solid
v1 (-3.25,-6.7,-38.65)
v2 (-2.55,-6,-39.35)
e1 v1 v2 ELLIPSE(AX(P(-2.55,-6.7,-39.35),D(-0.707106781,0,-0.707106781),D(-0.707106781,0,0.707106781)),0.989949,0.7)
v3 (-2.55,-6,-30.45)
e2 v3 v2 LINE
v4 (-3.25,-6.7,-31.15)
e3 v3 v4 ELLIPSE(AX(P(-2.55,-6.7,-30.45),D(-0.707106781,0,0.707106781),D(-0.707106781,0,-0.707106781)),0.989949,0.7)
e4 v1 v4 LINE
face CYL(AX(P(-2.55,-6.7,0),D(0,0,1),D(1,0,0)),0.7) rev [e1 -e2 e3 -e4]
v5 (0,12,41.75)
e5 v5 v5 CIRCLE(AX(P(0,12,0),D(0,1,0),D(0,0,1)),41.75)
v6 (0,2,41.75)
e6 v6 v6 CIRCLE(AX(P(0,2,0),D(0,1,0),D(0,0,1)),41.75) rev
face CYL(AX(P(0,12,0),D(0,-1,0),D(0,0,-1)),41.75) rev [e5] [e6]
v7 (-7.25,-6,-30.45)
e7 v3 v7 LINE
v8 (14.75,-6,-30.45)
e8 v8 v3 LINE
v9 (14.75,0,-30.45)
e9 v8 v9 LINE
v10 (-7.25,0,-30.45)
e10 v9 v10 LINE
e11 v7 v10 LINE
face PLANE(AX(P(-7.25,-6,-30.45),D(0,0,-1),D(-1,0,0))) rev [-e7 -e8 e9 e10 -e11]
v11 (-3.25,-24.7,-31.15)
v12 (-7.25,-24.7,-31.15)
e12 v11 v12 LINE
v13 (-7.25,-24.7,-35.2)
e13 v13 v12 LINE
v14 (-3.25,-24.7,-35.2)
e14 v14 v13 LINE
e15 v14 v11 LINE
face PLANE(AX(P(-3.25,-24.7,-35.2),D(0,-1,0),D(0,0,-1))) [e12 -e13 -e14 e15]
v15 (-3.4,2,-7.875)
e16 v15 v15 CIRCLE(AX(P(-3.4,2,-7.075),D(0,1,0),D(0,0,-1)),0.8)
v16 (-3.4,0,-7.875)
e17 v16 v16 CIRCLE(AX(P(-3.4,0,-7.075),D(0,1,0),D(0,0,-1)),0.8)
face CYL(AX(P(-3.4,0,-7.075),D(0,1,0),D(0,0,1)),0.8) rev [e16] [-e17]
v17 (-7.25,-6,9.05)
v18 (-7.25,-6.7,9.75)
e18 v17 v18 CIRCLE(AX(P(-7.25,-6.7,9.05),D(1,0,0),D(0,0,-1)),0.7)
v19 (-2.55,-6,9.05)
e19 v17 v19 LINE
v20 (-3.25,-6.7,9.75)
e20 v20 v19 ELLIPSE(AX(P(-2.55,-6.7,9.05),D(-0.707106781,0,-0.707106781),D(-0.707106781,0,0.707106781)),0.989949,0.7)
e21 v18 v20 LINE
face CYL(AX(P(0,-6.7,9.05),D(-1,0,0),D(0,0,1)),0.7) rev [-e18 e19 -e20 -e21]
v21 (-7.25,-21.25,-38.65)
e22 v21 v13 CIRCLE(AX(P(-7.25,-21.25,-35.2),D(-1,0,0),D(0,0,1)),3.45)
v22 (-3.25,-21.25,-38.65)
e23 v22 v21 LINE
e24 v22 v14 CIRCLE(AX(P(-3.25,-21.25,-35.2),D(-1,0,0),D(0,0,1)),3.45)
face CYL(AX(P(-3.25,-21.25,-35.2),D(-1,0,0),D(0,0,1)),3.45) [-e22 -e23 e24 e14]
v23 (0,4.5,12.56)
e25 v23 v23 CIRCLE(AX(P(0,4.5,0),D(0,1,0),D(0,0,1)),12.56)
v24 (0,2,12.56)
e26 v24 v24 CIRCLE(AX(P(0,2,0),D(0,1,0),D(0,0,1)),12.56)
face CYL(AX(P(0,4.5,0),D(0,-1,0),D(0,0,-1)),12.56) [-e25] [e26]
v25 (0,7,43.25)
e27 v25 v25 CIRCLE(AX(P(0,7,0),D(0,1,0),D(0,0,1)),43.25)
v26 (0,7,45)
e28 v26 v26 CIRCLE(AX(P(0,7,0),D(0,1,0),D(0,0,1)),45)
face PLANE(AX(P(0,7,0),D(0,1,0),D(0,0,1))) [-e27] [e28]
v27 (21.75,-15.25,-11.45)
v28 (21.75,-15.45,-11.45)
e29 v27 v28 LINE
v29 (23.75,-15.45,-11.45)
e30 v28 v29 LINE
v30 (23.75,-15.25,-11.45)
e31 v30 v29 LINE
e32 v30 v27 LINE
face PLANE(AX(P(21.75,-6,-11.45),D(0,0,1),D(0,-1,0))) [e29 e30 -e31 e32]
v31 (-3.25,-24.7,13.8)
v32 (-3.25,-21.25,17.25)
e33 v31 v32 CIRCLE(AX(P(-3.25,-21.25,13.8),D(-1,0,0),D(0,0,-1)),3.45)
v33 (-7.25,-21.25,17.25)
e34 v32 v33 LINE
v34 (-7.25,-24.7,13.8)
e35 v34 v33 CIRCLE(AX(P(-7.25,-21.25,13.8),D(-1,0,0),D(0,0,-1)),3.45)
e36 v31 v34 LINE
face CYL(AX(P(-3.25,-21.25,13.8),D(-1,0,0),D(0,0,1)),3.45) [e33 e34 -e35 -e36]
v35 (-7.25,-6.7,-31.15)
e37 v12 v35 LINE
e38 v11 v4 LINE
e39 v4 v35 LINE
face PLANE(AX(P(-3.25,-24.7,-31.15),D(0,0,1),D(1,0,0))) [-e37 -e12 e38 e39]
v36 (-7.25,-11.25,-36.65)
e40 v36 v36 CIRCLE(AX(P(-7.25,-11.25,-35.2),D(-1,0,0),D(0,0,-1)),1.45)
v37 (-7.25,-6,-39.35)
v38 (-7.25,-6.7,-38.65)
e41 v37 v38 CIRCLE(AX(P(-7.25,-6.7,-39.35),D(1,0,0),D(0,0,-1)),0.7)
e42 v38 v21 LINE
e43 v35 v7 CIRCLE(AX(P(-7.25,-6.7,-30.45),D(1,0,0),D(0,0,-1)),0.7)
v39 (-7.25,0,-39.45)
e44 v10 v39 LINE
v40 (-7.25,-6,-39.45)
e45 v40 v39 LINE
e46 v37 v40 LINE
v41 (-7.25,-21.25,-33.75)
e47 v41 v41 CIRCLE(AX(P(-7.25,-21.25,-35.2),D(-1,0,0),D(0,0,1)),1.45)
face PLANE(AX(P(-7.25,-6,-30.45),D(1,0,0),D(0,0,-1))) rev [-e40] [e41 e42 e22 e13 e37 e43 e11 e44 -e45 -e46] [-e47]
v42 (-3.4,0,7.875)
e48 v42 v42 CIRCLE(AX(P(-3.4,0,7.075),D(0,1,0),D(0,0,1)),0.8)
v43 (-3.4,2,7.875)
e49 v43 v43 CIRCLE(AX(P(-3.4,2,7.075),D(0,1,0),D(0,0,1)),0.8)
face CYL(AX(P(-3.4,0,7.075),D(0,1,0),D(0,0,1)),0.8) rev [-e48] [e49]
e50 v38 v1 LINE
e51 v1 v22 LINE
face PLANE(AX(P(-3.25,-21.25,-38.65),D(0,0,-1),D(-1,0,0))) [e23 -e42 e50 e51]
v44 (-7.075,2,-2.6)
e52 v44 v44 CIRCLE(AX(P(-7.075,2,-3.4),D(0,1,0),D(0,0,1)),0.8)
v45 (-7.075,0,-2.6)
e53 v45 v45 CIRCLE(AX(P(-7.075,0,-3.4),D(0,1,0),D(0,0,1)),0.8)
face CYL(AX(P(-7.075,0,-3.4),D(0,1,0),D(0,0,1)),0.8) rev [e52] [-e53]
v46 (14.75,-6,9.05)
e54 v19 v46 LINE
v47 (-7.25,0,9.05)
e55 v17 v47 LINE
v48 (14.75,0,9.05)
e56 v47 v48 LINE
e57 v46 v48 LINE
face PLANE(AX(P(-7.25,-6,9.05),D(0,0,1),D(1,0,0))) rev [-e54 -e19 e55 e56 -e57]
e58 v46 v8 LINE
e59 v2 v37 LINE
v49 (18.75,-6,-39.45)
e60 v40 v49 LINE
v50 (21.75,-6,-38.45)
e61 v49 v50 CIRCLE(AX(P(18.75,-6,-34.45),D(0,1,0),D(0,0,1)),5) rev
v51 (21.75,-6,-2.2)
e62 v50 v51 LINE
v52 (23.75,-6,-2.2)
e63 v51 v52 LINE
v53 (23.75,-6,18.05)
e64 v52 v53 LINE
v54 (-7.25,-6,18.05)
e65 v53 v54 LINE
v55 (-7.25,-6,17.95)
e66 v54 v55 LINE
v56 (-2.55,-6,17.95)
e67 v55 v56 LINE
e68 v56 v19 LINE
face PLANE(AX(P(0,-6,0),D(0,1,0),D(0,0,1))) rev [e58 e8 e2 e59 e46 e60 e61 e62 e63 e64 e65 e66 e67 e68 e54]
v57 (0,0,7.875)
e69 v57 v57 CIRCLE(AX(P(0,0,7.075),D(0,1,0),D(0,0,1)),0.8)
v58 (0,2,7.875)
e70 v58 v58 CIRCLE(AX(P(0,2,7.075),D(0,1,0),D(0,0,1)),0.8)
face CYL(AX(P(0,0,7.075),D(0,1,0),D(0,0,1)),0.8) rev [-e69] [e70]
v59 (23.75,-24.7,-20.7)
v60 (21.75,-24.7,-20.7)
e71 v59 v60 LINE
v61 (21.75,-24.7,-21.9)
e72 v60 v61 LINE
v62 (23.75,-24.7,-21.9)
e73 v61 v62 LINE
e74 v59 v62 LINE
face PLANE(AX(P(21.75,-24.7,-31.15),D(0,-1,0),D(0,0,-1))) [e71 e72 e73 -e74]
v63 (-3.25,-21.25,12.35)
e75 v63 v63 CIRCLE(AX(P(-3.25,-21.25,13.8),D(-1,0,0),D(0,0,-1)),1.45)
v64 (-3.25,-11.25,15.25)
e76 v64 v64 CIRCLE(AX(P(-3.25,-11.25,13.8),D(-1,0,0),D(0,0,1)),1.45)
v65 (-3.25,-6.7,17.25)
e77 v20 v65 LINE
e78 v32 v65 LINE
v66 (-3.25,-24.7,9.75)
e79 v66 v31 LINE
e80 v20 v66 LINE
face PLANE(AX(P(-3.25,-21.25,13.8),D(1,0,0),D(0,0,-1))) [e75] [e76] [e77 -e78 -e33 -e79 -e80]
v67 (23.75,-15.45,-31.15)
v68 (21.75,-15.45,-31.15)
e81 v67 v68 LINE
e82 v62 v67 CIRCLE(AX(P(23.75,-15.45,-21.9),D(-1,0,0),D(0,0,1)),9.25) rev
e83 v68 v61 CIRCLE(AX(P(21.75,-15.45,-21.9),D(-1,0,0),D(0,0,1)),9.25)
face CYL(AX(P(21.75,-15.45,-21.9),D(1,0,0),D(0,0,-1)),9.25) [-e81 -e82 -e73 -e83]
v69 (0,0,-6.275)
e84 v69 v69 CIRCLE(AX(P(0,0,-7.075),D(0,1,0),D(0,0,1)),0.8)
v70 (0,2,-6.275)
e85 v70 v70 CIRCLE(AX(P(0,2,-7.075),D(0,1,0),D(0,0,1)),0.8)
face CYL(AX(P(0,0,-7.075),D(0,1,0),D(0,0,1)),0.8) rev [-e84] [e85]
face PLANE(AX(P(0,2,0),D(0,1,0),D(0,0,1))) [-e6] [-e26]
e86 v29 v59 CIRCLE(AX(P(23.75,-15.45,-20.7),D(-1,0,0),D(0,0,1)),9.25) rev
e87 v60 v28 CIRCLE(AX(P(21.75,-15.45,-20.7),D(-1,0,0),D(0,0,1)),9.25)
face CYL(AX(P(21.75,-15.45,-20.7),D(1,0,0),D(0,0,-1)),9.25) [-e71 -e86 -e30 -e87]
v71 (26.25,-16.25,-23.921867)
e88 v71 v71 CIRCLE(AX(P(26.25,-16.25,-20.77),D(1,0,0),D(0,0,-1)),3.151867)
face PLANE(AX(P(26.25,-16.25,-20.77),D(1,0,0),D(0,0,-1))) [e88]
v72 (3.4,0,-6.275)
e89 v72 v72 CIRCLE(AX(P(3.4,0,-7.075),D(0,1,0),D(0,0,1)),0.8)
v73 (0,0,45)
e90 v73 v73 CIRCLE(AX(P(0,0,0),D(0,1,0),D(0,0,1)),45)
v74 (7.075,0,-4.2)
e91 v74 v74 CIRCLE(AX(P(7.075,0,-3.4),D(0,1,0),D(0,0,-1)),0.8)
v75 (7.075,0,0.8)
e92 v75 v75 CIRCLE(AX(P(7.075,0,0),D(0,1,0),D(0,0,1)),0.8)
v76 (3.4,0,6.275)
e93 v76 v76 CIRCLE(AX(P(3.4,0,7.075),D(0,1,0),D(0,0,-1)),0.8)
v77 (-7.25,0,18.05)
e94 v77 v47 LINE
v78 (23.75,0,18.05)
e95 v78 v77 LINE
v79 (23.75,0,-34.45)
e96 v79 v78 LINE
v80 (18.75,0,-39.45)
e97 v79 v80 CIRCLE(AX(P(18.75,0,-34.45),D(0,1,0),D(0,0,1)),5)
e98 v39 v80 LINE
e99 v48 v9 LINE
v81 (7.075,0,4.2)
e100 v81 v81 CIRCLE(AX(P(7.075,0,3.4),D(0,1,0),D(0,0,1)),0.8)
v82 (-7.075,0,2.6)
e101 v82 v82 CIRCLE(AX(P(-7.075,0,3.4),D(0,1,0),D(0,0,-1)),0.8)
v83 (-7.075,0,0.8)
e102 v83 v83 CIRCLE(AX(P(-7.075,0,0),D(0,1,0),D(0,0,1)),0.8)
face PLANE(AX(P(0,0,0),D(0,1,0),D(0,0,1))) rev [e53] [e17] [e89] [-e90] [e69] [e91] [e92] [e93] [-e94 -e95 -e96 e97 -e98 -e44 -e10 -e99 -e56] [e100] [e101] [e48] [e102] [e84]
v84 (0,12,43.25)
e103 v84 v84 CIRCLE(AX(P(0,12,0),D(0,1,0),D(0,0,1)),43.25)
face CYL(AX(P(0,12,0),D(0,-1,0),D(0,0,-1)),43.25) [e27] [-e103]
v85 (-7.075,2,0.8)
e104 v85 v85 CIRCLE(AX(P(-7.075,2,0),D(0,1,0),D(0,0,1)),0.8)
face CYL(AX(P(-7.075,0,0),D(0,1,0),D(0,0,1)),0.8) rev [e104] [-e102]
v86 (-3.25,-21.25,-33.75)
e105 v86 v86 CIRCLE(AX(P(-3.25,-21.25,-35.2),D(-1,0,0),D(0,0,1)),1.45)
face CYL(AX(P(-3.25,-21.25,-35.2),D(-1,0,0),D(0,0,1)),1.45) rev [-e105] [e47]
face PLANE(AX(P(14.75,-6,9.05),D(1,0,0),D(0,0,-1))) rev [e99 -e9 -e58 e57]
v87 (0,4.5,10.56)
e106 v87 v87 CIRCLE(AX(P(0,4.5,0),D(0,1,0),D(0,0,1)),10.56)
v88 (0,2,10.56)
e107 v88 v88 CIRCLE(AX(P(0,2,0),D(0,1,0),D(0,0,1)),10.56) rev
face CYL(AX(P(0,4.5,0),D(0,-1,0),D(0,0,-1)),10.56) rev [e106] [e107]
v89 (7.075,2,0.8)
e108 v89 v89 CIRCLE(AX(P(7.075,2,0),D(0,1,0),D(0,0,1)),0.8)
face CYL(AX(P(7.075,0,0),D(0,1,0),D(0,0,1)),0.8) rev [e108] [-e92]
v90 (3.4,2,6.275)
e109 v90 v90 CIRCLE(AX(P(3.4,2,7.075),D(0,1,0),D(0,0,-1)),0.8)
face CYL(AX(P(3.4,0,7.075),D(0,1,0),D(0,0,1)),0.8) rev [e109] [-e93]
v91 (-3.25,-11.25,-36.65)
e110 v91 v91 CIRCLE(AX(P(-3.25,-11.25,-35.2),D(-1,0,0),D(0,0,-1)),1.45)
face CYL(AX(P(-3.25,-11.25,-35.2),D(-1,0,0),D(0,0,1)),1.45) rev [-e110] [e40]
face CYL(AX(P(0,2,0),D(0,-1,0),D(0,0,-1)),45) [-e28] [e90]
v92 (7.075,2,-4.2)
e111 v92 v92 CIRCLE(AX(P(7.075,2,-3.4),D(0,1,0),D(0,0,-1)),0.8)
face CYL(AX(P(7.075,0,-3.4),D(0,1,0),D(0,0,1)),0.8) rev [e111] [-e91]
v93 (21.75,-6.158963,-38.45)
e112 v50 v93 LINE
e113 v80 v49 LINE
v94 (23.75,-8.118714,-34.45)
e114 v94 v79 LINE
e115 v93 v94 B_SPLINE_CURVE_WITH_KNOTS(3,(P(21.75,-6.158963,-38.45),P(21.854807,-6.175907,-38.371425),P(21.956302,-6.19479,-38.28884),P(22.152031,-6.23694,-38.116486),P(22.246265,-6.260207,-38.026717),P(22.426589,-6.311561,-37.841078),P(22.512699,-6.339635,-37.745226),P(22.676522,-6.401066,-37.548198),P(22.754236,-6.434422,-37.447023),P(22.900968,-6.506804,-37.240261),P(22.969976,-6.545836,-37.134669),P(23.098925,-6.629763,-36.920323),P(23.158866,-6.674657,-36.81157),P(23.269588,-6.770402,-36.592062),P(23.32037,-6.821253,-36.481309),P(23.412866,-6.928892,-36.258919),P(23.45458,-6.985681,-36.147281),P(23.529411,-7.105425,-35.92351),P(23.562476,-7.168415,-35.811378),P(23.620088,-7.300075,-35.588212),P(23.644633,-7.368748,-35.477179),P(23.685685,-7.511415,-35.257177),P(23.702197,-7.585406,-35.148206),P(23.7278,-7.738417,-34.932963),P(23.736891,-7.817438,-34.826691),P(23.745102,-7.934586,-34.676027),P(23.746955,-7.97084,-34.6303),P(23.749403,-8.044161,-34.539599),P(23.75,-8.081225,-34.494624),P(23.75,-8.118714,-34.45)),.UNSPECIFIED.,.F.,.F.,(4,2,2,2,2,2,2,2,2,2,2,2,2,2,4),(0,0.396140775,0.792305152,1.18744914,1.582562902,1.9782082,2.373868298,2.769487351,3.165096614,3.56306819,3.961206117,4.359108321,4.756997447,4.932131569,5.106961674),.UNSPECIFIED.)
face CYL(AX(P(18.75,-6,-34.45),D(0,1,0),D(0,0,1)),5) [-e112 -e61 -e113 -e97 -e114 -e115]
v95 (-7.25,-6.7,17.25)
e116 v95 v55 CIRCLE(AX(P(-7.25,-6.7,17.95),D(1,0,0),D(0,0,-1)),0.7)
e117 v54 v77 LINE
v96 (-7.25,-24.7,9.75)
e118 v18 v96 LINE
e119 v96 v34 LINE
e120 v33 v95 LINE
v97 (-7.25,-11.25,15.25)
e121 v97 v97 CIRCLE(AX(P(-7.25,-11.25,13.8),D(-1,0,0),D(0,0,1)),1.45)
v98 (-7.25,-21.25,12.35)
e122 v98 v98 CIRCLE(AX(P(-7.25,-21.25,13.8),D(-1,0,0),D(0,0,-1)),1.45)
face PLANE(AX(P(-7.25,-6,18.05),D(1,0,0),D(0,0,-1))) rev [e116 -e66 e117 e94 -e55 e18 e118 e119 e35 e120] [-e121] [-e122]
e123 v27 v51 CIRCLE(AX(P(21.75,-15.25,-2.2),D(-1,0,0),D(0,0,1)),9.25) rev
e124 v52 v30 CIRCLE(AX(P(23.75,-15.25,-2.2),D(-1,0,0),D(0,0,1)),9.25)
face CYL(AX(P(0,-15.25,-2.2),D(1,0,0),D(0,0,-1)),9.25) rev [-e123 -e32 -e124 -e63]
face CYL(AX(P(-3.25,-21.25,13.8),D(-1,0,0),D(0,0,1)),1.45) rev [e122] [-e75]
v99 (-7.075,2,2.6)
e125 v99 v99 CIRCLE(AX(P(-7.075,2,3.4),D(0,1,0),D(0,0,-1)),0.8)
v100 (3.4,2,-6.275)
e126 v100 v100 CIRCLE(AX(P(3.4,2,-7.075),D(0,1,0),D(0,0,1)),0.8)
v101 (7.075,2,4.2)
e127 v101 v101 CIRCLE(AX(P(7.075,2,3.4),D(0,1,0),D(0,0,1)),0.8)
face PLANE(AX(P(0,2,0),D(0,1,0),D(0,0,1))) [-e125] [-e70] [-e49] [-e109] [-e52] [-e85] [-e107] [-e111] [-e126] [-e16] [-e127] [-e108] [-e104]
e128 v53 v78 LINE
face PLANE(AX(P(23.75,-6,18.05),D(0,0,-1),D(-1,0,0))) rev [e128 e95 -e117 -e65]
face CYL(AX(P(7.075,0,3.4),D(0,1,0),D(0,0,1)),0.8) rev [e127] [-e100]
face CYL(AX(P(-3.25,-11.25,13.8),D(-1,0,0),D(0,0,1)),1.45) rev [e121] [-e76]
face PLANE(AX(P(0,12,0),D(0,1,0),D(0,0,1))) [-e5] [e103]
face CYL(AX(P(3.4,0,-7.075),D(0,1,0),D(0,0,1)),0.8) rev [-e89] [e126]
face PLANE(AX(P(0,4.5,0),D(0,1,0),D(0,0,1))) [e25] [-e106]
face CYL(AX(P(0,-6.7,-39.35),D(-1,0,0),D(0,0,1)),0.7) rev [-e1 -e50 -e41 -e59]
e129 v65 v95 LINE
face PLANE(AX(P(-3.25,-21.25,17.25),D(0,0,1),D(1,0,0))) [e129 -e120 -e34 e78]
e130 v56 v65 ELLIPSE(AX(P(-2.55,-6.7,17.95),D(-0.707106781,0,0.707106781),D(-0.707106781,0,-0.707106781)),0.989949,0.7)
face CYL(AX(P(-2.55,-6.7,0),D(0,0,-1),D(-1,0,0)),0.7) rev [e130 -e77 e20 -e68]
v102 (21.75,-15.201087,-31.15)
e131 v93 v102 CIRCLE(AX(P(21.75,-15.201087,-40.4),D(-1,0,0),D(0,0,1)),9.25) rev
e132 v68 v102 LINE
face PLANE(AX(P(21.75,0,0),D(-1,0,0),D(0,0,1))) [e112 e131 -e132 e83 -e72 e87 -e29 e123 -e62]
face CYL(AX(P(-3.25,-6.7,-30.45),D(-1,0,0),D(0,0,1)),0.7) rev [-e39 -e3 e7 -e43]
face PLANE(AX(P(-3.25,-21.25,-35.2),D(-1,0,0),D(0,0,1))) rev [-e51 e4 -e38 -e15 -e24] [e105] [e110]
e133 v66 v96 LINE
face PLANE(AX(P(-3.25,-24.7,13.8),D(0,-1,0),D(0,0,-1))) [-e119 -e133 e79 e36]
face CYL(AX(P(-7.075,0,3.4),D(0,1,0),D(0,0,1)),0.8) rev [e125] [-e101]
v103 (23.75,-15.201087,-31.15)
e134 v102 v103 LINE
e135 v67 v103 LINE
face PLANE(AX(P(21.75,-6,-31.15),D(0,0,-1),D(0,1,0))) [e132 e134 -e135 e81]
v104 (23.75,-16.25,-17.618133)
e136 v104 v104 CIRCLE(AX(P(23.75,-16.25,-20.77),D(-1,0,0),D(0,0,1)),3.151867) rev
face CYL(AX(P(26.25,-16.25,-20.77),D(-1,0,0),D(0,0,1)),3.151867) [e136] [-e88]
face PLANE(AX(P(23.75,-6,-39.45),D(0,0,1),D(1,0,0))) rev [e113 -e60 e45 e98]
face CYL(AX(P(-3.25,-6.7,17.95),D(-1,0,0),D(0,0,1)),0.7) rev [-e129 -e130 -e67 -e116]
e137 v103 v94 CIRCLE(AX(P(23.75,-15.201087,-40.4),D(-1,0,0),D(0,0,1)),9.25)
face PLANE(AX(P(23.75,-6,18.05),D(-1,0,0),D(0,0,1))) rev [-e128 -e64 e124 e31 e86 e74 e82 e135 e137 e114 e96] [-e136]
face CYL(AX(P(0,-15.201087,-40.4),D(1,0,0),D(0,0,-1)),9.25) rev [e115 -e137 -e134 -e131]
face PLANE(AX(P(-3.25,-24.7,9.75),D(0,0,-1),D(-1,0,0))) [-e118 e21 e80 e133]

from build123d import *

# Parameters (mm, degrees)
CROQUIS2_R              = 45
SALIENTE_EXTRUIR1_DEPTH = 2
CROQUIS3_R              = 43.25
CROQUIS3_R_2            = 41.75
SALIENTE_EXTRUIR2_DEPTH = 10
CROQUIS4_R              = 45
CROQUIS4_R_2            = 43.25
SALIENTE_EXTRUIR3_DEPTH = 5
CROQUIS6_R              = 12.56
CROQUIS6_R_2            = 10.56
SALIENTE_EXTRUIR4_DEPTH = 2.5
CROQUIS7_R              = 0.8
CORTAR_EXTRUIR1_DEPTH   = 65.420493634
SALIENTE_EXTRUIR5_DEPTH = 6
CROQUIS10_R             = 1.45
SALIENTE_EXTRUIR6_DEPTH = 4
CROQUIS11_W             = 19.7
CROQUIS11_H             = 18.7
SALIENTE_EXTRUIR7_DEPTH = 2
CROQUIS12_R             = 3.151866764
SALIENTE_EXTRUIR8_DEPTH = 2.5
REDONDEO1_R             = 9.25
REDONDEO2_R             = 0.7
REDONDEO4_R             = 5


# Some blends are built 0.0001 mm under size
with BuildPart() as part:
    # Croquis2 → Saliente-Extruir1 (new body)
    with BuildSketch(Plane(origin=(0, 0, 0), x_dir=(1, 0, 0), z_dir=(0, 1, 0))):
        with Locations(Location((0, 0, 0), (0, 0, 270))):
            Circle(CROQUIS2_R)
    extrude(amount=SALIENTE_EXTRUIR1_DEPTH)

    # Croquis3 → Saliente-Extruir2 (add)
    with BuildSketch(Plane(origin=(0, 2, 0), x_dir=(1, 0, 0), z_dir=(0, 1, 0))):
        with Locations(Location((0, 0, 0), (0, 0, 270))):
            Circle(CROQUIS3_R)
        with Locations(Location((0, 0, 0), (0, 0, 270))):
            Circle(CROQUIS3_R_2, mode=Mode.SUBTRACT)
    extrude(amount=SALIENTE_EXTRUIR2_DEPTH)

    # Croquis4 → Saliente-Extruir3 (add)
    with BuildSketch(Plane(origin=(0, 2, 0), x_dir=(1, 0, 0), z_dir=(0, 1, 0))):
        with Locations(Location((0, 0, 0), (0, 0, 270))):
            Circle(CROQUIS4_R)
        with Locations(Location((0, 0, 0), (0, 0, 270))):
            Circle(CROQUIS4_R_2, mode=Mode.SUBTRACT)
    extrude(amount=SALIENTE_EXTRUIR3_DEPTH)

    # Croquis6 → Saliente-Extruir4 (add)
    with BuildSketch(Plane(origin=(0, 2, 0), x_dir=(1, 0, 0), z_dir=(0, 1, 0))):
        with Locations(Location((0, 0, 0), (0, 0, 270))):
            Circle(CROQUIS6_R)
        with Locations(Location((0, 0, 0), (0, 0, 270))):
            Circle(CROQUIS6_R_2, mode=Mode.SUBTRACT)
    extrude(amount=SALIENTE_EXTRUIR4_DEPTH)

    # Croquis7 → Cortar-Extruir1 (cut, through all)
    with BuildSketch(Plane(origin=(0, 2, 0), x_dir=(1, 0, 0), z_dir=(0, 1, 0))):
        with Locations(Location((0, 7.075, 0), (0, 0, 270))):
            Circle(CROQUIS7_R)
        with Locations(Location((3.4, 7.075, 0), (0, 0, 270))):
            Circle(CROQUIS7_R)
        with Locations(Location((-3.4, 7.075, 0), (0, 0, 90))):
            Circle(CROQUIS7_R)
        with Locations(Location((7.075, 3.4, 0), (0, 0, 90))):
            Circle(CROQUIS7_R)
        with Locations(Location((7.075, 0, 0), (0, 0, 270))):
            Circle(CROQUIS7_R)
        with Locations(Location((7.075, -3.4, 0), (0, 0, 270))):
            Circle(CROQUIS7_R)
        with Locations(Location((3.4, -7.075, 0), (0, 0, 90))):
            Circle(CROQUIS7_R)
        with Locations(Location((0, -7.075, 0), (0, 0, 270))):
            Circle(CROQUIS7_R)
        with Locations(Location((-3.4, -7.075, 0), (0, 0, 270))):
            Circle(CROQUIS7_R)
        with Locations(Location((-7.075, -3.4, 0), (0, 0, 90))):
            Circle(CROQUIS7_R)
        with Locations(Location((-7.075, 0, 0), (0, 0, 270))):
            Circle(CROQUIS7_R)
        with Locations(Location((-7.075, 3.4, 0), (0, 0, 270))):
            Circle(CROQUIS7_R)
    extrude(amount=-CORTAR_EXTRUIR1_DEPTH, mode=Mode.SUBTRACT)

    # Croquis8 → Saliente-Extruir5 (add)
    with BuildSketch(Plane.XZ):
        Polygon((-7.25, 9.05), (14.75, 9.05), (14.75, -30.45), (-7.25, -30.45), (-7.25, -39.45), (23.75, -39.45), (23.75, 18.05), (-7.25, 18.05), align=None)
    extrude(amount=SALIENTE_EXTRUIR5_DEPTH)

    # Croquis10 → Saliente-Extruir6 (add)
    # profile 1 of 2: a face of its own
    with BuildSketch(Plane.ZY.offset(7.25)):
        with BuildLine():
            Line((9.75, -24.7), (9.75, -6))
            Line((9.75, -6), (17.25, -6))
            Line((17.25, -6), (17.25, -21.25))
            ThreePointArc((17.25, -21.25), (16.239518395, -23.689518395), (13.8, -24.7))
            Line((13.8, -24.7), (9.75, -24.7))
        make_face()
        with Locations((13.8, -11.25)):
            Circle(CROQUIS10_R, mode=Mode.SUBTRACT)
        with Locations(Location((13.8, -21.25, 0), (0, 0, 180))):
            Circle(CROQUIS10_R, mode=Mode.SUBTRACT)
    # profile 2 of 2: a face of its own
    with BuildSketch(Plane.ZY.offset(7.25)):
        with BuildLine():
            Line((-31.15, -24.7), (-31.15, -6))
            Line((-31.15, -6), (-38.65, -6))
            Line((-38.65, -6), (-38.65, -21.25))
            ThreePointArc((-38.65, -21.25), (-37.639518395, -23.689518395), (-35.2, -24.7))
            Line((-35.2, -24.7), (-31.15, -24.7))
        make_face()
        with Locations((-35.2, -21.25)):
            Circle(CROQUIS10_R, mode=Mode.SUBTRACT)
        with Locations(Location((-35.2, -11.25, 0), (0, 0, 180))):
            Circle(CROQUIS10_R, mode=Mode.SUBTRACT)
    extrude(amount=-SALIENTE_EXTRUIR6_DEPTH)

    # Croquis11 → Saliente-Extruir7 (add)
    with BuildSketch(Plane(origin=(23.75, 0, 0), x_dir=(0, 0, -1), z_dir=(1, 0, 0))):
        with Locations((21.3, -15.35)):
            Rectangle(CROQUIS11_W, CROQUIS11_H)
    extrude(amount=-SALIENTE_EXTRUIR7_DEPTH)

    # Croquis12 → Saliente-Extruir8 (add)
    with BuildSketch(Plane(origin=(23.75, 0, 0), x_dir=(0, 0, -1), z_dir=(1, 0, 0))):
        with Locations(Location((20.77, -16.25, 0), (0, 0, 180))):
            Circle(CROQUIS12_R)
    extrude(amount=SALIENTE_EXTRUIR8_DEPTH)

    # Redondeo1
    # the kernel refuses this fillet: 9.25 mm, written as the material it adds along each edge
    with BuildSketch(Plane(origin=(23.75, -6, -31.15), x_dir=(0, 0, -1), z_dir=(-1, 0, 0))) as redondeo1_piece_1:
        with BuildLine():
            CenterArc((9.25, 9.201086892), REDONDEO1_R, 180, 84.1051745)
            Line((0, 9.201086892), (0, 0))
            Line((0, 0), (8.3, 0))
        make_face()
    extrude(amount=2)
    with BuildSketch(Plane(origin=(23.75, -6, -11.45), x_dir=(0, 0, 1), z_dir=(-1, 0, 0))) as redondeo1_piece_2:
        with BuildLine():
            CenterArc((REDONDEO1_R, -REDONDEO1_R), REDONDEO1_R, 90, 90)
            Line((0, -REDONDEO1_R), (0, 0))
            Line((0, 0), (REDONDEO1_R, 0))
        make_face()
    extrude(amount=2)
    # the kernel refuses this fillet: 9.25 mm, written as the material it takes off along each edge
    with BuildSketch(Plane(origin=(46.875, -24.7, -31.15), x_dir=(0, 0, 1), z_dir=(-1, 0, 0)), Plane(origin=(46.875, -24.7, -11.45), x_dir=(0, 1, 0), z_dir=(-1, 0, 0))) as redondeo1_2_piece_1:
        with BuildLine():
            CenterArc((REDONDEO1_R, REDONDEO1_R), REDONDEO1_R, 180, 90)
            Line((0, REDONDEO1_R), (0, 0))
            Line((0, 0), (REDONDEO1_R, 0))
        make_face()
    extrude(amount=48.25, mode=Mode.SUBTRACT)

    # Redondeo2
    redondeo2_edges = [part.edges().sort_by_distance(p)[0] for p in [
        (-3.25, -6, -34.9),
        (-5.25, -6, -38.65),
        (-5.25, -6, -31.15),
        (-3.25, -6, 13.5),
        (-5.25, -6, 9.75),
        (-5.25, -6, 17.25),
    ]]
    fillet(redondeo2_edges, radius=REDONDEO2_R - 0.0001)  # a hair under: the kernel refuses the full size

    # Redondeo4
    # the kernel refuses this fillet: 5 mm, written as the material it takes off along each edge
    with BuildSketch(Plane(origin=(23.75, 0, -39.45), x_dir=(0, 0, 1), z_dir=(0, -1, 0))) as redondeo4_piece_1:
        with BuildLine():
            CenterArc((REDONDEO4_R, REDONDEO4_R), REDONDEO4_R, 180, 90)
            Line((0, REDONDEO4_R), (0, 0))
            Line((0, 0), (REDONDEO4_R, 0))
        make_face()
    extrude(amount=18.5, mode=Mode.SUBTRACT)


solid = part.part
